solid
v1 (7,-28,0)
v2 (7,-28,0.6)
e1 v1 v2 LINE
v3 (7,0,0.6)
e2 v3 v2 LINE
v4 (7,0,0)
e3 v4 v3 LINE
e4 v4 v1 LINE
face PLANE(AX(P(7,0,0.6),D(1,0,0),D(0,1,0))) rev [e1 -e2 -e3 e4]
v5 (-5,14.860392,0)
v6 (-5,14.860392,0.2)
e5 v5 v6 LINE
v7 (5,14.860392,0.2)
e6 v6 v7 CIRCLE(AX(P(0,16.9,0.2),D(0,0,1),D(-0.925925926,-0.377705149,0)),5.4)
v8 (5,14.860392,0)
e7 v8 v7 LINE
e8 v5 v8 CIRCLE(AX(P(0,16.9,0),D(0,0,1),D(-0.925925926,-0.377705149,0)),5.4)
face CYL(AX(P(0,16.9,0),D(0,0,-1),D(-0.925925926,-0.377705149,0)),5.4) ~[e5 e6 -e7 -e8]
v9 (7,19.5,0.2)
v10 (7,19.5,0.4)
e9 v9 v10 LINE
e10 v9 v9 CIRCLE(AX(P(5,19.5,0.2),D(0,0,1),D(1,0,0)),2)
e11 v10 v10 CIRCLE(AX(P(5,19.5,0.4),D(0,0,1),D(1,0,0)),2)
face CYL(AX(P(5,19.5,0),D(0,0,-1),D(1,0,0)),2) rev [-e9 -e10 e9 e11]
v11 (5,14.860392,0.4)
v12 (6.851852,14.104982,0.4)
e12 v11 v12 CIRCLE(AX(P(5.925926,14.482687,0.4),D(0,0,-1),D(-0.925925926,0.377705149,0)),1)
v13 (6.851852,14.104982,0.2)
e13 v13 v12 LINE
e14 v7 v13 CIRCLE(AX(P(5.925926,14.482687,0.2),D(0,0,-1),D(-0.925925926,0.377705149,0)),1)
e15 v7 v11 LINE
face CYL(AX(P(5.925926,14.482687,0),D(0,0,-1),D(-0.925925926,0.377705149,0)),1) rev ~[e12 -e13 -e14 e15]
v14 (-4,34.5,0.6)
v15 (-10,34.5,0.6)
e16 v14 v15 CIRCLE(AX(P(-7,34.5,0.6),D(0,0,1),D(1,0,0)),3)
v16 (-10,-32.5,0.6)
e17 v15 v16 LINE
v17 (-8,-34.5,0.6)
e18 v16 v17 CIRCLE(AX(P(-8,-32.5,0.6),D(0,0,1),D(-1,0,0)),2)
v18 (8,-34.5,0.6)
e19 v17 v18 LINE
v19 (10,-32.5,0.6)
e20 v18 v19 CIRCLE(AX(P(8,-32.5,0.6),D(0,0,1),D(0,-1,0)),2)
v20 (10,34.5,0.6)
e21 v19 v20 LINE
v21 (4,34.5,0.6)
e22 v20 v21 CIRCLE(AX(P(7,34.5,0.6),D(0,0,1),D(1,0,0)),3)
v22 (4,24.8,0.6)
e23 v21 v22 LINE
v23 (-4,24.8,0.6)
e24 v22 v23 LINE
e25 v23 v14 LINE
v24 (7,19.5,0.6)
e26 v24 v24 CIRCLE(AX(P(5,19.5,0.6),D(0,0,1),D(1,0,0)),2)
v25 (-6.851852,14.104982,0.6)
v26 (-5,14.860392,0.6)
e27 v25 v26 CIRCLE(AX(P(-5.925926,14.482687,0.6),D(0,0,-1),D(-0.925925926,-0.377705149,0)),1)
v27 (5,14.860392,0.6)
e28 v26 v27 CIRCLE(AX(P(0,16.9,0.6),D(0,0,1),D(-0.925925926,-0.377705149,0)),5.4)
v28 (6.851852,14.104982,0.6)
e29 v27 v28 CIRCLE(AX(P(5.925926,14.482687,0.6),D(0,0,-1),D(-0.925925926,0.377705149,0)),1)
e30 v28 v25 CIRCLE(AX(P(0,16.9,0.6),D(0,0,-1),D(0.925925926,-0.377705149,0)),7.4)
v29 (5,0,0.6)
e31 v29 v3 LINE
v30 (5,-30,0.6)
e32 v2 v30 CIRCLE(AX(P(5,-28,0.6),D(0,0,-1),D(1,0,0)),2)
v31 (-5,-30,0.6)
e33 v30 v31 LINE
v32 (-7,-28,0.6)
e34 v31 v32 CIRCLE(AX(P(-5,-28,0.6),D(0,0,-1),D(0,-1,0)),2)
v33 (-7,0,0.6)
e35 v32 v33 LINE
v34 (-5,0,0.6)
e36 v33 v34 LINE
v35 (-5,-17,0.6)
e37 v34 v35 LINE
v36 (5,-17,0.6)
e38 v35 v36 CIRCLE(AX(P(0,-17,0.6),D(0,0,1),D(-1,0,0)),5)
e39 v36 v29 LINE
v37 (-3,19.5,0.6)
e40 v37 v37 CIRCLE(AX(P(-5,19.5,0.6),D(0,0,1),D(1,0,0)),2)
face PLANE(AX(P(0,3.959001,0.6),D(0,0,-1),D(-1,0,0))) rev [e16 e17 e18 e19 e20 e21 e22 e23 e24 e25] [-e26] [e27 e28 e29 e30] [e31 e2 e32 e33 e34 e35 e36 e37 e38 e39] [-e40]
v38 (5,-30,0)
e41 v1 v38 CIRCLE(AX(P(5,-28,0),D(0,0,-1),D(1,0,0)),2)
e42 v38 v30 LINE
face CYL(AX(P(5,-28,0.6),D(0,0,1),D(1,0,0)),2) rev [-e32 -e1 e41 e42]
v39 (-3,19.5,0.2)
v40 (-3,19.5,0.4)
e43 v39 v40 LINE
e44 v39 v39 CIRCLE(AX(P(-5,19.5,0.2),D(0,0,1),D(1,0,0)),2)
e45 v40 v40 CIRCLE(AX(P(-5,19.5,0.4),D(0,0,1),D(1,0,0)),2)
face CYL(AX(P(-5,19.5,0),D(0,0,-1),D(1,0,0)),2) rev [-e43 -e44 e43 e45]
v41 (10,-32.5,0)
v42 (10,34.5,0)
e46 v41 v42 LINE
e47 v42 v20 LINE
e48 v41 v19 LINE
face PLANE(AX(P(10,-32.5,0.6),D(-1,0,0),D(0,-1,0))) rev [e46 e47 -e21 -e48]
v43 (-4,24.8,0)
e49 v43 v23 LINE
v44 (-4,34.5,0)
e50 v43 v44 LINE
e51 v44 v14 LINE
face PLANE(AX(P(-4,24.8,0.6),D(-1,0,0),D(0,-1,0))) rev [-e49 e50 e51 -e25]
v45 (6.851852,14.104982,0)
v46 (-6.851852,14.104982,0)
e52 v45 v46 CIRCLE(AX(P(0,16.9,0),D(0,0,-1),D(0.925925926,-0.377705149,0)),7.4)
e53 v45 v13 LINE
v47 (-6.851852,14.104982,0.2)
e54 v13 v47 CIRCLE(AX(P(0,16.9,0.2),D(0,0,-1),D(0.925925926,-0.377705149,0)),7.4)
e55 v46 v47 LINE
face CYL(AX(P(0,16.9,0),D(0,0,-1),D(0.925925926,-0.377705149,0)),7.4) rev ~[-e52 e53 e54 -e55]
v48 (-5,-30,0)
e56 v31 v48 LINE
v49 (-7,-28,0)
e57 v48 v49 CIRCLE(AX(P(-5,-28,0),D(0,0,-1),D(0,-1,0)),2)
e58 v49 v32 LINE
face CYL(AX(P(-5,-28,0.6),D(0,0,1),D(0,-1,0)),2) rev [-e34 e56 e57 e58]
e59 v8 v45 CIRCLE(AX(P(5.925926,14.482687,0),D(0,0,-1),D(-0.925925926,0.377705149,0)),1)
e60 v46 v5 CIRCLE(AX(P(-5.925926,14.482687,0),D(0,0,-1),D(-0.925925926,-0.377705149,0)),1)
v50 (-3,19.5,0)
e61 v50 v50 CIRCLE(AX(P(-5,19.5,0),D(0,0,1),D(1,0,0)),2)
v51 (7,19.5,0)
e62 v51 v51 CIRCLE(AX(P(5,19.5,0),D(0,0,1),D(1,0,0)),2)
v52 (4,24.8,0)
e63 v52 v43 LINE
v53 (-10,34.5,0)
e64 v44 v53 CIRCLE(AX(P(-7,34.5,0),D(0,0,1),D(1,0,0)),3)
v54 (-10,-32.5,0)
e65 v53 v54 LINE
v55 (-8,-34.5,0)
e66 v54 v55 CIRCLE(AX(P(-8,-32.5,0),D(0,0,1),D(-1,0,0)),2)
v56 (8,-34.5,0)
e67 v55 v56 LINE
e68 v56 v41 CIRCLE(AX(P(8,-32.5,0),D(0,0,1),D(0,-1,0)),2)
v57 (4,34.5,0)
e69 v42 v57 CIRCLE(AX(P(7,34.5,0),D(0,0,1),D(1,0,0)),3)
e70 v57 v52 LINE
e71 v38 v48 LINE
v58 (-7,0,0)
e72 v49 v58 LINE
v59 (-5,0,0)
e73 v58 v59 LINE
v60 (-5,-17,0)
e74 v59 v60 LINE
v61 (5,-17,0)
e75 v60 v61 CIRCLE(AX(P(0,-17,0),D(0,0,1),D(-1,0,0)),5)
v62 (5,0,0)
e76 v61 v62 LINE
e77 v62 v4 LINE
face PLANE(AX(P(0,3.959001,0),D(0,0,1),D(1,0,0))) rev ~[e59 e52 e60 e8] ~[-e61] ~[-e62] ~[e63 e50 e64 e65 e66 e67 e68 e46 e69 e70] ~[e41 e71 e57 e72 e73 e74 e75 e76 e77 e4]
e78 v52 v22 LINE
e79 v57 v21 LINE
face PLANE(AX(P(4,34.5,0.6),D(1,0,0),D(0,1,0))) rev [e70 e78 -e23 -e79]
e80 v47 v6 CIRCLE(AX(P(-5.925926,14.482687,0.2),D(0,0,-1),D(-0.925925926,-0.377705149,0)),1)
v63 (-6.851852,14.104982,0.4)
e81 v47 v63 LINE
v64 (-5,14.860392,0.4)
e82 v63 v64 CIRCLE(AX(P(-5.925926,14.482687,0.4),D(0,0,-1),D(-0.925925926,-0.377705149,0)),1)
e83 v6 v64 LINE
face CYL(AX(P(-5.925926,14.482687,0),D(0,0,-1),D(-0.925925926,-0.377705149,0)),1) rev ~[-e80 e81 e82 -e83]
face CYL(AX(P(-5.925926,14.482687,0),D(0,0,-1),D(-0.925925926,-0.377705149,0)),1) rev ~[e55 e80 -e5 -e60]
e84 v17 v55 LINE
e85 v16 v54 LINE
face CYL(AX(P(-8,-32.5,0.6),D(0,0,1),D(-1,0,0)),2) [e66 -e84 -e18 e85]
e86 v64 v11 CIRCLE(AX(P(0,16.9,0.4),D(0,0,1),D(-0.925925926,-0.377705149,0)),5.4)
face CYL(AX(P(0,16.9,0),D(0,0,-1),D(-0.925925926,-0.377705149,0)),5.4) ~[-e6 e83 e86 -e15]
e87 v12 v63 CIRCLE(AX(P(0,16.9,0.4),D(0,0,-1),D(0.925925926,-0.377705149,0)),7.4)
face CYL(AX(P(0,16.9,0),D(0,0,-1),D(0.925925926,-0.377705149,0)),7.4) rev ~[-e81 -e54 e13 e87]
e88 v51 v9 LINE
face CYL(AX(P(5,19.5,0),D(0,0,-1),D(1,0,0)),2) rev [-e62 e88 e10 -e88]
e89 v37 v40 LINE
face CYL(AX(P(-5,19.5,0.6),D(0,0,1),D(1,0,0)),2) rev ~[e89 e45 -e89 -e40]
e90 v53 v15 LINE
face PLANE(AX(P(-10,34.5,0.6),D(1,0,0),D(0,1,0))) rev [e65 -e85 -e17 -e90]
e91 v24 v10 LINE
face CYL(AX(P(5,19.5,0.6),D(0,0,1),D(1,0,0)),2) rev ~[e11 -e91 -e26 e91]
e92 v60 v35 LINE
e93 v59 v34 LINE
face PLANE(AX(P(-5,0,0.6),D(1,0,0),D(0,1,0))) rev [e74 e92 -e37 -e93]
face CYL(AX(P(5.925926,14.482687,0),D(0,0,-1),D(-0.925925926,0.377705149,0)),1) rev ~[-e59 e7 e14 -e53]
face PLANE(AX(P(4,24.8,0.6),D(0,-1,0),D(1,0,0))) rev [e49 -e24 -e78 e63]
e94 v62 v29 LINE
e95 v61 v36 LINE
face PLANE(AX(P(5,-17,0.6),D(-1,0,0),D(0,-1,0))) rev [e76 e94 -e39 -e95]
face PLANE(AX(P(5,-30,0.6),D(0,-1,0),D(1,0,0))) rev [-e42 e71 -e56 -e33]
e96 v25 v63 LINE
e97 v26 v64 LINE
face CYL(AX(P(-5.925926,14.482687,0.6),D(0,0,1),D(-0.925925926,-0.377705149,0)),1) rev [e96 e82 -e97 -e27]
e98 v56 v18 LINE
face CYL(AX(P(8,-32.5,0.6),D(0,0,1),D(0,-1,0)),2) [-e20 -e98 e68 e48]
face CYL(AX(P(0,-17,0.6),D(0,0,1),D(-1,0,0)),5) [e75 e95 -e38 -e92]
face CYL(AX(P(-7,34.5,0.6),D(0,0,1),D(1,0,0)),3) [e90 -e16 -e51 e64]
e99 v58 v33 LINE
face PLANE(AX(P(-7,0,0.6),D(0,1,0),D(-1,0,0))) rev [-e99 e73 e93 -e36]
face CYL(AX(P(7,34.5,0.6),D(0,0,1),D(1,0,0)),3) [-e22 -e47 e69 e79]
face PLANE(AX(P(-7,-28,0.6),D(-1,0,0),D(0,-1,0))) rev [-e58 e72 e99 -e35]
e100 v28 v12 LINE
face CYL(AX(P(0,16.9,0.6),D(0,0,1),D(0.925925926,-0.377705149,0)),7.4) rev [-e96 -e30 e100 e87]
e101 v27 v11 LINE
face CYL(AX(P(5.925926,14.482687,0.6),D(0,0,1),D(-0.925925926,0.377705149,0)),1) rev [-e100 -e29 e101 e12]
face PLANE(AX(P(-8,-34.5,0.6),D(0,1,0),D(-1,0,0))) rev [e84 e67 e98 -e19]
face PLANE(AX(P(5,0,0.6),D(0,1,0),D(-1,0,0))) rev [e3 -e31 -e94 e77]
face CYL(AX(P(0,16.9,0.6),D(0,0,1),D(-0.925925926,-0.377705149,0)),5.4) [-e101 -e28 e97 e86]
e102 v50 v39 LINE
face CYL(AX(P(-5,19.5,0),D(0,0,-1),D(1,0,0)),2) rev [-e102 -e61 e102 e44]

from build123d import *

# Parameters (mm, degrees)
F0_R     = 2
F1_DEPTH = 0.4


# Not quite as in the source:
# - a pattern or mirror of a feature is missing from the dataset's text; its kind, count and spacing are read off the source's solid


with BuildPart() as f1:
    # F0 (on Top) → F1 (new body)
    with BuildSketch(Plane.XY):
        with BuildLine():
            Line((-8, -34.5), (8, -34.5))
            ThreePointArc((8, -34.5), (9.4142135624, -33.9142135624), (10, -32.5))
            Line((10, -32.5), (10, 34.5))
            ThreePointArc((10, 34.5), (7, 37.5), (4, 34.5))
            Line((4, 34.5), (4, 24.8))
            Line((4, 24.8), (-4, 24.8))
            Line((-4, 24.8), (-4, 34.5))
            ThreePointArc((-4, 34.5), (-7, 37.5), (-10, 34.5))
            Line((-10, 34.5), (-10, -32.5))
            ThreePointArc((-10, -32.5), (-9.4142135624, -33.9142135624), (-8, -34.5))
        make_face()
        with BuildLine():
            Line((-7, -28), (-7, 0))
            Line((-7, 0), (-5, 0))
            Line((-5, 0), (5, 0))
            Line((5, 0), (7, 0))
            Line((7, 0), (7, -28))
            ThreePointArc((7, -28), (6.4142135624, -29.4142135624), (5, -30))
            Line((5, -30), (-5, -30))
            ThreePointArc((-5, -30), (-6.4142135624, -29.4142135624), (-7, -28))
        make_face(mode=Mode.SUBTRACT)
        with Locations((-5, 19.5)):
            Circle(F0_R, mode=Mode.SUBTRACT)
        with BuildLine():
            ThreePointArc((-5, 14.8603921946), (0, 11.5), (5, 14.8603921946))
            ThreePointArc((5, 14.8603921946), (6.3036310751, 15.4086129713), (6.8518518519, 14.1049818963))
            ThreePointArc((6.8518518519, 14.1049818963), (0, 9.5), (-6.8518518519, 14.1049818963))
            ThreePointArc((-6.8518518519, 14.1049818963), (-6.3036310751, 15.4086129713), (-5, 14.8603921946))
        make_face(mode=Mode.SUBTRACT)
        with Locations((5, 19.5)):
            Circle(F0_R, mode=Mode.SUBTRACT)
        with BuildLine():
            Line((5, 0), (-5, 0))
            Line((-5, 0), (-5, -17))
            ThreePointArc((-5, -17), (0, -22), (5, -17))
            Line((5, -17), (5, 0))
        make_face()
    extrude(amount=F1_DEPTH)

    # F1_copies: F1 across plane


with BuildPart() as f1_1:
    add(f1.part)
    add(f1.part.mirror(Plane.XY.offset(0.3)))


solid = f1_1.part
